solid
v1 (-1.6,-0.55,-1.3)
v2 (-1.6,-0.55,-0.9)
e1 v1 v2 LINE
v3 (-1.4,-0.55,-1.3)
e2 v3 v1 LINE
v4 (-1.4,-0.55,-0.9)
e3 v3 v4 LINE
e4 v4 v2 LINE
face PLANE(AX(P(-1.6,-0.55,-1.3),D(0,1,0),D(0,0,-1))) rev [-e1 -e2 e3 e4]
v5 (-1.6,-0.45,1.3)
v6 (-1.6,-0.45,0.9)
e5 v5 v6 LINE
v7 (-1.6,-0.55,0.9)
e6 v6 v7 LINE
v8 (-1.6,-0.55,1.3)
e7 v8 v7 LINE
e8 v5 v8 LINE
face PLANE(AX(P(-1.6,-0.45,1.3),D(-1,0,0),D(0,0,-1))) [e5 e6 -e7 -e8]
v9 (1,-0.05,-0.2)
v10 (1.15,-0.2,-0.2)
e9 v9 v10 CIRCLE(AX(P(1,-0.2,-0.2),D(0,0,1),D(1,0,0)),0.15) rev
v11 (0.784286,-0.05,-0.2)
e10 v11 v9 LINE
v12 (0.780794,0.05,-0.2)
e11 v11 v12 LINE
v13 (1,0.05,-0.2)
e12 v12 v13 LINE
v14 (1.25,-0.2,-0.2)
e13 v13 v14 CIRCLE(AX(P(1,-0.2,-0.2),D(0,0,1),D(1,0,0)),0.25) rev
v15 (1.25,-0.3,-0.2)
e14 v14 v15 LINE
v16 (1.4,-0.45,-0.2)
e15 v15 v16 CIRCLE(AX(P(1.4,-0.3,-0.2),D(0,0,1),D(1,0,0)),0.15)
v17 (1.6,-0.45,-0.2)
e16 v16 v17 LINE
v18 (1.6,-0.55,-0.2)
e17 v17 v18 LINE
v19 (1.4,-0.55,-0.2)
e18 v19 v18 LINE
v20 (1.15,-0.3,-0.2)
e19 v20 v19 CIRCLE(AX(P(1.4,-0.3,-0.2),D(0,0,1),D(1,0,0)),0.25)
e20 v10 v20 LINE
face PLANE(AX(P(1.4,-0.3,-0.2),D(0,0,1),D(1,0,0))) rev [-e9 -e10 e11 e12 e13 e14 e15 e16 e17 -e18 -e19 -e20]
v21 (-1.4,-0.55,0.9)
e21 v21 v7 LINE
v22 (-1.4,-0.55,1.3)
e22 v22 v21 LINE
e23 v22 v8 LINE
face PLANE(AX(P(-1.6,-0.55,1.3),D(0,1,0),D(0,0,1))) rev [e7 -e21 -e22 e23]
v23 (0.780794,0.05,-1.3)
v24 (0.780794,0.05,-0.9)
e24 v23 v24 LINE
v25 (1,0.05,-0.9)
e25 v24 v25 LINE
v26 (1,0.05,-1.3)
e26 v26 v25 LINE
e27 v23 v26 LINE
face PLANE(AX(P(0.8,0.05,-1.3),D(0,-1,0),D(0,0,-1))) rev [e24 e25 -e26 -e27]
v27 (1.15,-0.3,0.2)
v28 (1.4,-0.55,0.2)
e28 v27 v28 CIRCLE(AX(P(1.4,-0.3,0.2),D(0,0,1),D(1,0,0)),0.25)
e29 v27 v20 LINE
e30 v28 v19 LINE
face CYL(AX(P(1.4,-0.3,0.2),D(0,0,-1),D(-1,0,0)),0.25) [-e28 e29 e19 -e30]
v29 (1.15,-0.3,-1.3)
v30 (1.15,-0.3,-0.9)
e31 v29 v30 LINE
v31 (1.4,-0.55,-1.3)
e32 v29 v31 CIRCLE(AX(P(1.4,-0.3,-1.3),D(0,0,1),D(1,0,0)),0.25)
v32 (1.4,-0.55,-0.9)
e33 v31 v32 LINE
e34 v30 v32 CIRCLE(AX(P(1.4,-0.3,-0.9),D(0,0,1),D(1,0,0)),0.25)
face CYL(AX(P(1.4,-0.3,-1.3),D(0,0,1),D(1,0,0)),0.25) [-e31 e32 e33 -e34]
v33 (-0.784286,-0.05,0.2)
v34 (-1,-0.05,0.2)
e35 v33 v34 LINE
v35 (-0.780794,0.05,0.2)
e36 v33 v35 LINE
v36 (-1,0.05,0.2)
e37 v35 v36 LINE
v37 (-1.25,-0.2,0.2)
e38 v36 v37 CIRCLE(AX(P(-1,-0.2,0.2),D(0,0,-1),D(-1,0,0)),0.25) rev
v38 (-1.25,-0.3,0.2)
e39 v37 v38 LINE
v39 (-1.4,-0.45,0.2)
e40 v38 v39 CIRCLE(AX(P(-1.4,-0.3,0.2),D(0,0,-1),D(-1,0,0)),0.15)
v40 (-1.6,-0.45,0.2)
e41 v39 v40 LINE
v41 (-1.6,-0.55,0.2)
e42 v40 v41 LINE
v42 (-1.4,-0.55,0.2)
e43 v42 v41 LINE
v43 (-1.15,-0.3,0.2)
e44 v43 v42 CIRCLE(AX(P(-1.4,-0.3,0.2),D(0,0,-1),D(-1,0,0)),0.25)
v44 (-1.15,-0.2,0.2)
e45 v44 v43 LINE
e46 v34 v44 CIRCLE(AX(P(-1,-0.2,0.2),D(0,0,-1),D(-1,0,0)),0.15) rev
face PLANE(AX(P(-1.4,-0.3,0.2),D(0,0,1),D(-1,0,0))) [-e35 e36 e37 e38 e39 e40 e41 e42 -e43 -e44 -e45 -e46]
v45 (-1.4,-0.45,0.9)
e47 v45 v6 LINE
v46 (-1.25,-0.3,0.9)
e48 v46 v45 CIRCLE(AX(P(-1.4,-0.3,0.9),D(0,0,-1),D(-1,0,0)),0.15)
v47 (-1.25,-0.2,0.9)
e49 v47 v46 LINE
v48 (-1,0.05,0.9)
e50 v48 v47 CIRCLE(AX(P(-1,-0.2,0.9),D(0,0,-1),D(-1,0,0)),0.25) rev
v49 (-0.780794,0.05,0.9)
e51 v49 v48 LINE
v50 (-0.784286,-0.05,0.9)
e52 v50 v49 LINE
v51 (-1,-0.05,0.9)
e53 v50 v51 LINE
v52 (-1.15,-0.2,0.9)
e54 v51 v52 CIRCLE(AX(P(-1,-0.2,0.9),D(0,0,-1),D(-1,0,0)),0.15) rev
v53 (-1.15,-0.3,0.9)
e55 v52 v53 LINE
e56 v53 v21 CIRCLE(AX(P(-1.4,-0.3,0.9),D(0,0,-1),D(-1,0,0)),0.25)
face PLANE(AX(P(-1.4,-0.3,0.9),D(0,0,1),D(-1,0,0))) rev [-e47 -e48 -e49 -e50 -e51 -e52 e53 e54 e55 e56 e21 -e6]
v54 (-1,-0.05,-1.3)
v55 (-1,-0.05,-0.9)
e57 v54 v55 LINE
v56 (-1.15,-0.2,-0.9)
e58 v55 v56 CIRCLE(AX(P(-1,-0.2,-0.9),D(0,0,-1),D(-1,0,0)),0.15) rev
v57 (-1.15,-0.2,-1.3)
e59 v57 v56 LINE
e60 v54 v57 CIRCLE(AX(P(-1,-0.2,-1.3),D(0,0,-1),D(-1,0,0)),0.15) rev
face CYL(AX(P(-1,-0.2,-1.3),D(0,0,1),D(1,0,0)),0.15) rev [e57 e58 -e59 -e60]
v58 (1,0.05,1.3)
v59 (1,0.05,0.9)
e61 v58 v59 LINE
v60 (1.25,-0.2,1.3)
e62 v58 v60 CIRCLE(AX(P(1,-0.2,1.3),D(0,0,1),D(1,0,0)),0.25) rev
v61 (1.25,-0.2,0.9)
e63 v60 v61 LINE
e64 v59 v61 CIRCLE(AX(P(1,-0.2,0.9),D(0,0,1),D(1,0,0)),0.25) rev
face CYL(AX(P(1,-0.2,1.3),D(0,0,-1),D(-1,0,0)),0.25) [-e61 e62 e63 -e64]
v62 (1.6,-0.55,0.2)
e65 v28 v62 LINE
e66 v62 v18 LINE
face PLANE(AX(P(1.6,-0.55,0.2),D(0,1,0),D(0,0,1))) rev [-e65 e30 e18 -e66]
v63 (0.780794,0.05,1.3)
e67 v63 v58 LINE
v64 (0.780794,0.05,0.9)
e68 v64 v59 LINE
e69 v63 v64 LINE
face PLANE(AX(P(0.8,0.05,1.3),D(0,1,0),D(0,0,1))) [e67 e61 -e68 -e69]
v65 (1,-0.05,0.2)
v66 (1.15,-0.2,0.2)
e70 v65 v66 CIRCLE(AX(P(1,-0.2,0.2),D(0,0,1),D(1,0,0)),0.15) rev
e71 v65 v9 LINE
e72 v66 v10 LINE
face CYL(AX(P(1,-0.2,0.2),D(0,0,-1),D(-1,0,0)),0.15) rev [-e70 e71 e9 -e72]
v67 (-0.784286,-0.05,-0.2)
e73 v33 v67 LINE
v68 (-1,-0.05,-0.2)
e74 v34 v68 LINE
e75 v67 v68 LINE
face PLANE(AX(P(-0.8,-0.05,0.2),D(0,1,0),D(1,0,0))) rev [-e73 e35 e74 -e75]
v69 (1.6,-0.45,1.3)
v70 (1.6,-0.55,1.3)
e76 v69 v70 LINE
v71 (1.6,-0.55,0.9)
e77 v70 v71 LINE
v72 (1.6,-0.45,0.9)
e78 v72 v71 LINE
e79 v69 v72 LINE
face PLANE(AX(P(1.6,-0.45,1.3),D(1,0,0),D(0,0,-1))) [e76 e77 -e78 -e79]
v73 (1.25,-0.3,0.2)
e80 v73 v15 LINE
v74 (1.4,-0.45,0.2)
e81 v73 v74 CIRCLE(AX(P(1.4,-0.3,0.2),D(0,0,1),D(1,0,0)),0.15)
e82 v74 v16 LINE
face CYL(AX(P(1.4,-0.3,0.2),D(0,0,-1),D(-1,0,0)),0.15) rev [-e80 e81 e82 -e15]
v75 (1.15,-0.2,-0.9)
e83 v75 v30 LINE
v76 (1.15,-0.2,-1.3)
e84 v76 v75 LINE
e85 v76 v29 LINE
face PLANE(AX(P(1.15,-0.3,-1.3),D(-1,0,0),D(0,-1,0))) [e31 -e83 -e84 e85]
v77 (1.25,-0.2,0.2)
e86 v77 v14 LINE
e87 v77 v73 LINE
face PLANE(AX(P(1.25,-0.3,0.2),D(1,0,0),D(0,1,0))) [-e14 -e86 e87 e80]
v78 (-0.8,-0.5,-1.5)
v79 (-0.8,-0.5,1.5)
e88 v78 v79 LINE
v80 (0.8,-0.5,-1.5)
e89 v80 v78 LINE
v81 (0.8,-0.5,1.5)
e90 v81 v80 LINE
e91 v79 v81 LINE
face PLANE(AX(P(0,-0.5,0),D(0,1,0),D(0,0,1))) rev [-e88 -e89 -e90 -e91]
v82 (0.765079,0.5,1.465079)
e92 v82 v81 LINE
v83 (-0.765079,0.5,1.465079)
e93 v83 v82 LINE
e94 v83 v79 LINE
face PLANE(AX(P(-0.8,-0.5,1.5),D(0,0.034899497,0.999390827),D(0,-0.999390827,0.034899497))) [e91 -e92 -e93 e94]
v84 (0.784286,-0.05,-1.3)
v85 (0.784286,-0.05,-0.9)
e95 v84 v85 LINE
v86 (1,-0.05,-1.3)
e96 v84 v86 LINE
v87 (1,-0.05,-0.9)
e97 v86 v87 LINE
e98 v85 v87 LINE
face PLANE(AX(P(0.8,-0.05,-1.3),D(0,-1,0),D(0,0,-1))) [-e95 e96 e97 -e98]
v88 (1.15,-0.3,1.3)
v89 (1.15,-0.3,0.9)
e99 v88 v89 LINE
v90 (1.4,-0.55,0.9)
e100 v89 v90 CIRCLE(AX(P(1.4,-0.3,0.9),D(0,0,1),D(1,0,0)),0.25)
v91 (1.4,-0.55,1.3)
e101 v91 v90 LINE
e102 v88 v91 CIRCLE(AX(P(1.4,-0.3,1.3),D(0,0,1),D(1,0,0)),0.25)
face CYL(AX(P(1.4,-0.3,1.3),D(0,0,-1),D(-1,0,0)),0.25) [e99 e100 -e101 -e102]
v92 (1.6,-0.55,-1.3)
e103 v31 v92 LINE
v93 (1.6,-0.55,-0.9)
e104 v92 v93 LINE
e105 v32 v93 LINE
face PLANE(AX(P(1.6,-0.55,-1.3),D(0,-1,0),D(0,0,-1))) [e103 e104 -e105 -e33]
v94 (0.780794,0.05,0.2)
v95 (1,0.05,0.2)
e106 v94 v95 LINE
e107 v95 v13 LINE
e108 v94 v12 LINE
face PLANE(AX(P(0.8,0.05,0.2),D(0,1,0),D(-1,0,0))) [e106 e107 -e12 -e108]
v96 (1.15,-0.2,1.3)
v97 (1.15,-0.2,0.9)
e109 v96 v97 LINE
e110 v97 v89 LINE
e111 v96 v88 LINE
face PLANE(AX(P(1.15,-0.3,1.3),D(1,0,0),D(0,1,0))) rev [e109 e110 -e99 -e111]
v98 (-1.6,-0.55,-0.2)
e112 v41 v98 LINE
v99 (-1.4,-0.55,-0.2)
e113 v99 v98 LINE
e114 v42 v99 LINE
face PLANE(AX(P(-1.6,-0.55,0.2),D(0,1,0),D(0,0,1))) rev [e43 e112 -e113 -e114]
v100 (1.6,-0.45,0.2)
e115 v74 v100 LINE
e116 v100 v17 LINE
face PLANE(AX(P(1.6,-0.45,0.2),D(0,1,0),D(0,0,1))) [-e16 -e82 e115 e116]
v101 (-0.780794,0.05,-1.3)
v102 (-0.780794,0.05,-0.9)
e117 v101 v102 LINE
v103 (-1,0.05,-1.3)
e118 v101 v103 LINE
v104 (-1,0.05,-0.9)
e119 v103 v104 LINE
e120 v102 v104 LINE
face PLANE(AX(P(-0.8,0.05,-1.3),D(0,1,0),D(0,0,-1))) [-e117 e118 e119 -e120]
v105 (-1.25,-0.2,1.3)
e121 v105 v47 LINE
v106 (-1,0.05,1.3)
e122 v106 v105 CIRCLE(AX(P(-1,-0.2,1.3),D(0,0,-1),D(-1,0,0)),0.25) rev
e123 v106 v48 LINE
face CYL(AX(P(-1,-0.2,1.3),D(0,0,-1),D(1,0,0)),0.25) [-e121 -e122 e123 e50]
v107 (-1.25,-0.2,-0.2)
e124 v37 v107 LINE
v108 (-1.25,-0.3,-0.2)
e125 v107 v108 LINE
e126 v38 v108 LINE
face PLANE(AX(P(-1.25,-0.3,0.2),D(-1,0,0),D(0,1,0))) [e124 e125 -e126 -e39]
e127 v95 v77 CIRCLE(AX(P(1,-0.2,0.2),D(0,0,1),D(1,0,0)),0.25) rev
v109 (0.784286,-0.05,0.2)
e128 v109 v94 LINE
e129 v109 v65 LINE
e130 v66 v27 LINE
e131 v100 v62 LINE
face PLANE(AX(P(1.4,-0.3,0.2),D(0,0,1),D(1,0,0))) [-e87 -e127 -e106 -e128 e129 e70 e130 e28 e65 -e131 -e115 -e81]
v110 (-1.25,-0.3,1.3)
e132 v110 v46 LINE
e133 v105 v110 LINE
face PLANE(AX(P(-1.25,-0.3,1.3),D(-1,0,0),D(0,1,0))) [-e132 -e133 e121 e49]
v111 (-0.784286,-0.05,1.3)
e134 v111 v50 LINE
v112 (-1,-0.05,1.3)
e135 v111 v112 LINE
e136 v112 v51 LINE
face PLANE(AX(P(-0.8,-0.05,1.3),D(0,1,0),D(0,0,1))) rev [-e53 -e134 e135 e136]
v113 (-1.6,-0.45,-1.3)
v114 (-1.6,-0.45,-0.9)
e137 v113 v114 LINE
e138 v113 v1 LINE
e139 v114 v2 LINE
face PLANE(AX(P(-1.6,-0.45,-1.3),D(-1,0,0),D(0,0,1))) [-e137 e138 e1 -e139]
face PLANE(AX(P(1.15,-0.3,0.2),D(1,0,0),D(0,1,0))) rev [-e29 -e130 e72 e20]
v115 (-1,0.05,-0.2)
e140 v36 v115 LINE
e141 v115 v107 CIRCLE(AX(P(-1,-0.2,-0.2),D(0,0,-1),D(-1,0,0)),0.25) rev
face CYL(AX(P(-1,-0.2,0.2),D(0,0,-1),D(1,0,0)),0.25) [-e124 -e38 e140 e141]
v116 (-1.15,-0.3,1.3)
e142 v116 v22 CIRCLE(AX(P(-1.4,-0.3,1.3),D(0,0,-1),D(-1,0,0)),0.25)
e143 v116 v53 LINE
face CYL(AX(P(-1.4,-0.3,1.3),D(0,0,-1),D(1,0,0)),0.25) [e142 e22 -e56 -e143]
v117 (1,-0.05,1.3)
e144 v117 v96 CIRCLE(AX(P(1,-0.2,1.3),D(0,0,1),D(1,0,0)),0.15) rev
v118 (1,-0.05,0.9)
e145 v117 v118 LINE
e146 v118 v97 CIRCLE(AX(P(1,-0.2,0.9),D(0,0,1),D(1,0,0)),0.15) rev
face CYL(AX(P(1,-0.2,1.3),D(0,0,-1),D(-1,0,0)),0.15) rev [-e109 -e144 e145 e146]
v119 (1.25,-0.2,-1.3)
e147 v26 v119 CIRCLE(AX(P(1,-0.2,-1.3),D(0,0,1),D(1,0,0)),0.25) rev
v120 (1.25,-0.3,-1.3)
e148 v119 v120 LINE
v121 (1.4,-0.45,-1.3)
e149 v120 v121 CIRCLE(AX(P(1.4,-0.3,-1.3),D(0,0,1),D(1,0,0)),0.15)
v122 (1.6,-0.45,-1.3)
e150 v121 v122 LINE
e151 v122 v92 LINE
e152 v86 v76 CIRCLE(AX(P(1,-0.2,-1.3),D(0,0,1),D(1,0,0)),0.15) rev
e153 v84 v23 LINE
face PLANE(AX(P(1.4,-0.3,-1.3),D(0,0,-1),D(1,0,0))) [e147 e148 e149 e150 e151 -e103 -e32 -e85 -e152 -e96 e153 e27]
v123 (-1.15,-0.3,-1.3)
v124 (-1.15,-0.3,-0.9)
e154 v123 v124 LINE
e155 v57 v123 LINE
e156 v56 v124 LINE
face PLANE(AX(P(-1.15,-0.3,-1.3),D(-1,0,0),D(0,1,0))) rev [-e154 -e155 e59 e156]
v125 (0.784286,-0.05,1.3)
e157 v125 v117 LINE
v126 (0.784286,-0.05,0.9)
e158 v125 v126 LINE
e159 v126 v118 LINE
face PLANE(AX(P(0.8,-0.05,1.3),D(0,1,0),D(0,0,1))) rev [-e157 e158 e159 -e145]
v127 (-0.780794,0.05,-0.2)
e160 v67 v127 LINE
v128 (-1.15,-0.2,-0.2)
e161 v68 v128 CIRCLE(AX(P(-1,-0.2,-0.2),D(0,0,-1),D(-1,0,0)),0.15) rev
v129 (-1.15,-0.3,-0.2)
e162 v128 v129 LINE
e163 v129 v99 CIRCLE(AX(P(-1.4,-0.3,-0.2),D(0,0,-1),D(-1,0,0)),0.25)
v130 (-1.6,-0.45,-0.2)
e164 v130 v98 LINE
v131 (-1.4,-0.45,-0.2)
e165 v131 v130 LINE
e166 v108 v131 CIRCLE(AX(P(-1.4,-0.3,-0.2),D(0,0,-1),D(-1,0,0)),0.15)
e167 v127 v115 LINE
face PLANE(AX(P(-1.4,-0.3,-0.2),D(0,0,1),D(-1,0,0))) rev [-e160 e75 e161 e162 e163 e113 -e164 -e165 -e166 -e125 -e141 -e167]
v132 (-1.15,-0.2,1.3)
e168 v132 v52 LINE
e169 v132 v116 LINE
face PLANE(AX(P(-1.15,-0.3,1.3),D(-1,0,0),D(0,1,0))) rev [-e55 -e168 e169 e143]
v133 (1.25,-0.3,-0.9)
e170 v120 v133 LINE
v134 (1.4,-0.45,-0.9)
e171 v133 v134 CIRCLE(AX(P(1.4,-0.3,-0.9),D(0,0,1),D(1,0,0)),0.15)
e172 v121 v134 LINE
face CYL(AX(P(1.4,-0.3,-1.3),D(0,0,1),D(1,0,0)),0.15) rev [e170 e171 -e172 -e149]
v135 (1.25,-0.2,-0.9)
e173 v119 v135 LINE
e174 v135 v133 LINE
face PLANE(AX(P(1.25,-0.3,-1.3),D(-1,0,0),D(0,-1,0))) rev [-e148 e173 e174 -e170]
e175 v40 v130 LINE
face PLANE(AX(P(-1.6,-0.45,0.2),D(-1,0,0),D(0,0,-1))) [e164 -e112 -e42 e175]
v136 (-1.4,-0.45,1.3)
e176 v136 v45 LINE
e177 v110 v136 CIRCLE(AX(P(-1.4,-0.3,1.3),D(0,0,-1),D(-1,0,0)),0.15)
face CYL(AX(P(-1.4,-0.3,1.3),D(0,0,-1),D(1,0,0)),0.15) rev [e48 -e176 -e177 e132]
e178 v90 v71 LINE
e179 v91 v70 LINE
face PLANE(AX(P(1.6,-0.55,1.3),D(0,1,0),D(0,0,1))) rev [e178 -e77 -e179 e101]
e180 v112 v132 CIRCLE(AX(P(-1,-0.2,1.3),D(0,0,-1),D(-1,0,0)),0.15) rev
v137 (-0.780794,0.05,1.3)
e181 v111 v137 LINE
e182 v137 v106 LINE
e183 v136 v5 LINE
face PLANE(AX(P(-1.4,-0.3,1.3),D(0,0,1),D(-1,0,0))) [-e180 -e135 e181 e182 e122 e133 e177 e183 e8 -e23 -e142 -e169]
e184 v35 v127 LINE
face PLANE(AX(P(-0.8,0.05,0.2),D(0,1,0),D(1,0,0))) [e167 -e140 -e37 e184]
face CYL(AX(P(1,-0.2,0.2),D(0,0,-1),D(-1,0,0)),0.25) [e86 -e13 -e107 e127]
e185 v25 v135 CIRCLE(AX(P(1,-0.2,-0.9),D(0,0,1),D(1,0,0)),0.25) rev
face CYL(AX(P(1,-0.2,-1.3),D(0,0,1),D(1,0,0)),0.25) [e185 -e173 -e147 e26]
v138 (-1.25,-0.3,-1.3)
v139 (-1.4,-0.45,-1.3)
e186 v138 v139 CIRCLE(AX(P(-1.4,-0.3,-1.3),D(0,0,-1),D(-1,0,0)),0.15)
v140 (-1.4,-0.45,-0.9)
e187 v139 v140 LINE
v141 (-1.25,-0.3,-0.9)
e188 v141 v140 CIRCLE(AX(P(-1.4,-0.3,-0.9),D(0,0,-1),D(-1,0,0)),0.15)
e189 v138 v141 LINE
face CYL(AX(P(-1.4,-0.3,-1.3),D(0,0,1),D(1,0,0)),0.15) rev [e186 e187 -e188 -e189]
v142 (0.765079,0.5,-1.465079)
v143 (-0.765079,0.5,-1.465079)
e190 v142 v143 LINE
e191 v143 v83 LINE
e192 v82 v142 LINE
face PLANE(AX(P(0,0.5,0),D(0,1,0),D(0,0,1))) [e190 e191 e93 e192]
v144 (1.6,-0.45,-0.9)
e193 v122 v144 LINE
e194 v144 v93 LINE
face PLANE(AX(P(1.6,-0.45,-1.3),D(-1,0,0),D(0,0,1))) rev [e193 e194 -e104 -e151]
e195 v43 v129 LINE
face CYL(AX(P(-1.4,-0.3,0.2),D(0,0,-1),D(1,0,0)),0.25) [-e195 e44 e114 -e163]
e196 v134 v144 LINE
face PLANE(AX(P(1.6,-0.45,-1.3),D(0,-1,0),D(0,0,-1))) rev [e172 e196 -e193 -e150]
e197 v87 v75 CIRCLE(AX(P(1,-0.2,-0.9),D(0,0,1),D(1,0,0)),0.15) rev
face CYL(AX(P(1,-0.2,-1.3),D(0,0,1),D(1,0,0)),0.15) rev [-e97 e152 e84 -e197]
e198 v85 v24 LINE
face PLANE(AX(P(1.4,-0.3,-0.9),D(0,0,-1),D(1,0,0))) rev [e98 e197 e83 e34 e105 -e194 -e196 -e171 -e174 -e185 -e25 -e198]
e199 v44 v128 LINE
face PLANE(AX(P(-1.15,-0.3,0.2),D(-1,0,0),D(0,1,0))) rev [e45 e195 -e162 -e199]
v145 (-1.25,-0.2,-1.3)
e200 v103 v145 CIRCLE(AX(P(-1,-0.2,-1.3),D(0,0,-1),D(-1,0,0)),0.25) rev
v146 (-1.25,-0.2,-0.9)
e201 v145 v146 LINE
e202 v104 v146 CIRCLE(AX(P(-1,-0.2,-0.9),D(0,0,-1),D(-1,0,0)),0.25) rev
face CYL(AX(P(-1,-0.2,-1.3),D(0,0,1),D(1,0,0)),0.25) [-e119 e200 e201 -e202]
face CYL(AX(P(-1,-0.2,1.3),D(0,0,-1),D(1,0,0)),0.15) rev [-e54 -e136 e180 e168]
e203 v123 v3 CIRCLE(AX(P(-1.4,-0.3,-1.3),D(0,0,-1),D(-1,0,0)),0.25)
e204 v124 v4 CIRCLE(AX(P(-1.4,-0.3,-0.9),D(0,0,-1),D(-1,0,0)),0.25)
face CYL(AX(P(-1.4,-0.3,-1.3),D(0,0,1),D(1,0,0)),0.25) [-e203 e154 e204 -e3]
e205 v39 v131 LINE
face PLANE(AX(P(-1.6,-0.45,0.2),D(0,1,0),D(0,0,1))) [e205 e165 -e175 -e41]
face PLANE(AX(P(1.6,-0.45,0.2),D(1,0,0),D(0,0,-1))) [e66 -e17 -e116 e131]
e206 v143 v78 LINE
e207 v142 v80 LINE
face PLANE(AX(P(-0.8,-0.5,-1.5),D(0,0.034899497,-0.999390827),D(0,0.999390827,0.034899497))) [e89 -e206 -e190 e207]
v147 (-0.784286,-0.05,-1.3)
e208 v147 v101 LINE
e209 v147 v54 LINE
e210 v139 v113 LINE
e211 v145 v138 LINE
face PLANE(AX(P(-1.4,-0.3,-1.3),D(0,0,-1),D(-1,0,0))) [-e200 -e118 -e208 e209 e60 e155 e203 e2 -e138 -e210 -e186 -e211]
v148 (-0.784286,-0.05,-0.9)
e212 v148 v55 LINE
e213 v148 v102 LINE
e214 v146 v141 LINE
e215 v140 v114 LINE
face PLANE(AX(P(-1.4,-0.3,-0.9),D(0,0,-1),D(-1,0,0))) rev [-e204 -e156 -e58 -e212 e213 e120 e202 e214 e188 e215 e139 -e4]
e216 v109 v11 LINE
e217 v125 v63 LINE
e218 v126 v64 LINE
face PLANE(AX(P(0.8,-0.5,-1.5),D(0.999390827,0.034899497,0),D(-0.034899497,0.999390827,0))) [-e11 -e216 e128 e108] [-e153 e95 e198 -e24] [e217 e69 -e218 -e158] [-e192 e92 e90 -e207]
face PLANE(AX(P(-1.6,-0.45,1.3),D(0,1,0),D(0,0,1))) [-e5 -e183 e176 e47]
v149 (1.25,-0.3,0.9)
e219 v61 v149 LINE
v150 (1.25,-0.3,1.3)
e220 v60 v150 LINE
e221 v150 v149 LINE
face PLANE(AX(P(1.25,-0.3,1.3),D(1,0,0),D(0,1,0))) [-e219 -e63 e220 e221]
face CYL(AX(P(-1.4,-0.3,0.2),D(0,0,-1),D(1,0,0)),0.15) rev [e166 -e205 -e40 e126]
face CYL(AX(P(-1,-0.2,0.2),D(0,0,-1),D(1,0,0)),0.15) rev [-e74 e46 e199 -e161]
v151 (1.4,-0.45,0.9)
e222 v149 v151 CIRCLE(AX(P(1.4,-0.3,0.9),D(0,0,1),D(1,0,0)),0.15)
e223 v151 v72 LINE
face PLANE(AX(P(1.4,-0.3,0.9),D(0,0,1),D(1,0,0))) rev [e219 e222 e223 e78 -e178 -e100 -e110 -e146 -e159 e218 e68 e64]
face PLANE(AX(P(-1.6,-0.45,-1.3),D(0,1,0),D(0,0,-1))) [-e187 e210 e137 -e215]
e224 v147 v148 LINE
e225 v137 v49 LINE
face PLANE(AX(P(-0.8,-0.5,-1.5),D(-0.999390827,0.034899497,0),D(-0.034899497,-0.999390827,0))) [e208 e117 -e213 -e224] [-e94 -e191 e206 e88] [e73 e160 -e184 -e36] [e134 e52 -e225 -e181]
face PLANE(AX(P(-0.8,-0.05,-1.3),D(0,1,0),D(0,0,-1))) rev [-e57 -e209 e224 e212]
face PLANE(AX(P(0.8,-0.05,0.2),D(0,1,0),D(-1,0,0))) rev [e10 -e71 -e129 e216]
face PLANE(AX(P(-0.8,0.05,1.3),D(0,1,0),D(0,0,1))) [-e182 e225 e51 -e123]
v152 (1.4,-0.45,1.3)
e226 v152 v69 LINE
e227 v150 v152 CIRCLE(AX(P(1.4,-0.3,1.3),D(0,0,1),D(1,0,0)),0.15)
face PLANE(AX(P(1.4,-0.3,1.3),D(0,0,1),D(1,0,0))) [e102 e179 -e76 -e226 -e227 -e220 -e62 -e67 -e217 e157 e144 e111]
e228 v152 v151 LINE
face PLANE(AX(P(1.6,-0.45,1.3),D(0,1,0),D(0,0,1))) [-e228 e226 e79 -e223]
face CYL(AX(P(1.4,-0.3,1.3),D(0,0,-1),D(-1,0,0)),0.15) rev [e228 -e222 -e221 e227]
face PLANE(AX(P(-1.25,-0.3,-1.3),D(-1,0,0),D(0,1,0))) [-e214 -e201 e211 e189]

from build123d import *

# Parameters (mm, degrees)
BASES_W         = 1.6
BASES_H         = 3
BASE_DEPTH      = 0.5
LEG2_DEPTH      = 0.2
MIDDLELEG_DEPTH = 0.2
BODYDRAFT_ANGLE = -2
MIRROR1_START   = -1.3
MIRROR1_DEPTH   = 0.4
MIRROR1_START_2 = -0.2
MIRROR1_2_DEPTH = 0.4
MIRROR1_START_3 = 0.9
MIRROR1_3_DEPTH = 0.4


# Read off the part's stored shape, not the designer's step: Mirror1
with BuildPart() as part:
    # BaseS → Base (new, symmetric)
    with BuildSketch(Plane(origin=(0, 0, 0), x_dir=(1, 0, 0), z_dir=(0, 1, 0))):
        Rectangle(BASES_W, BASES_H)
    extrude(amount=BASE_DEPTH, both=True)

    # Leg2S → Leg2 (add, symmetric)
    with BuildSketch(Plane.XY.offset(1.1)):
        with BuildLine():
            Line((1.6, -0.45), (1.4, -0.45))
            ThreePointArc((1.4, -0.45), (1.293933983, -0.406066017), (1.25, -0.3))
            Line((1.25, -0.3), (1.25, -0.2))
            ThreePointArc((1.25, -0.2), (1.176776695, -0.023223305), (1, 0.05))
            Line((1, 0.05), (0.8, 0.05))
            Line((0.8, 0.05), (0.8, -0.05))
            Line((0.8, -0.05), (1, -0.05))
            ThreePointArc((1, -0.05), (1.106066017, -0.093933983), (1.15, -0.2))
            Line((1.15, -0.2), (1.15, -0.3))
            ThreePointArc((1.15, -0.3), (1.223223305, -0.476776695), (1.4, -0.55))
            Line((1.4, -0.55), (1.6, -0.55))
            Line((1.6, -0.55), (1.6, -0.45))
        make_face()
    leg2 = extrude(amount=LEG2_DEPTH, both=True)

    # Leg2M: Leg2 across plane
    add(leg2.mirror(Plane.XY))

    # MiddleLegS → MiddleLeg (add, symmetric)
    with BuildSketch(Plane.XY):
        with BuildLine():
            Line((1.6, -0.45), (1.4, -0.45))
            ThreePointArc((1.4, -0.45), (1.293933983, -0.406066017), (1.25, -0.3))
            Line((1.25, -0.3), (1.25, -0.2))
            ThreePointArc((1.25, -0.2), (1.176776695, -0.023223305), (1, 0.05))
            Line((1, 0.05), (0.8, 0.05))
            Line((0.8, 0.05), (0.8, -0.05))
            Line((0.8, -0.05), (1, -0.05))
            ThreePointArc((1, -0.05), (1.106066017, -0.093933983), (1.15, -0.2))
            Line((1.15, -0.2), (1.15, -0.3))
            ThreePointArc((1.15, -0.3), (1.223223305, -0.476776695), (1.4, -0.55))
            Line((1.4, -0.55), (1.6, -0.55))
            Line((1.6, -0.55), (1.6, -0.45))
        make_face()
    extrude(amount=MIDDLELEG_DEPTH, both=True)

    # BodyDraft
    bodydraft_faces = [part.faces().sort_by_distance(p)[0] for p in [
        (0.8, -0.468377223, 0),
        (0, 0, -1.5),
        (-0.8, 0, 0),
        (0, 0, 1.5),
    ]]
    draft(bodydraft_faces, Plane(origin=(0, -0.5, 0), x_dir=(0, 0, -1), z_dir=(0, -1, 0)), BODYDRAFT_ANGLE)

    # Mirror1 outline → Mirror1 (add)
    with BuildSketch(Plane.XY.offset(MIRROR1_START)):
        with BuildLine():
            Line((-1.6, -0.55), (-1.4, -0.55))
            ThreePointArc((-1.4, -0.55), (-1.223223305, -0.476776695), (-1.15, -0.3))
            Line((-1.15, -0.3), (-1.15, -0.2))
            ThreePointArc((-1.15, -0.2), (-1.106066017, -0.093933983), (-1, -0.05))
            Line((-1, -0.05), (-0.784285654, -0.05))
            Line((-0.784285654, -0.05), (-0.780793577, 0.05))
            Line((-0.780793577, 0.05), (-1, 0.05))
            ThreePointArc((-1, 0.05), (-1.176776695, -0.023223305), (-1.25, -0.2))
            Line((-1.25, -0.2), (-1.25, -0.3))
            ThreePointArc((-1.25, -0.3), (-1.293933983, -0.406066017), (-1.4, -0.45))
            Line((-1.4, -0.45), (-1.6, -0.45))
            Line((-1.6, -0.45), (-1.6, -0.55))
        make_face()
    extrude(amount=MIRROR1_DEPTH)

    # Mirror1 2 outline → Mirror1 2 (add)
    with BuildSketch(Plane.XY.offset(MIRROR1_START_2)):
        with BuildLine():
            Line((-1.6, -0.55), (-1.4, -0.55))
            ThreePointArc((-1.4, -0.55), (-1.223223305, -0.476776695), (-1.15, -0.3))
            Line((-1.15, -0.3), (-1.15, -0.2))
            ThreePointArc((-1.15, -0.2), (-1.106066017, -0.093933983), (-1, -0.05))
            Line((-1, -0.05), (-0.784285654, -0.05))
            Line((-0.784285654, -0.05), (-0.780793577, 0.05))
            Line((-0.780793577, 0.05), (-1, 0.05))
            ThreePointArc((-1, 0.05), (-1.176776695, -0.023223305), (-1.25, -0.2))
            Line((-1.25, -0.2), (-1.25, -0.3))
            ThreePointArc((-1.25, -0.3), (-1.293933983, -0.406066017), (-1.4, -0.45))
            Line((-1.4, -0.45), (-1.6, -0.45))
            Line((-1.6, -0.45), (-1.6, -0.55))
        make_face()
    extrude(amount=MIRROR1_2_DEPTH)

    # Mirror1 3 outline → Mirror1 3 (add)
    with BuildSketch(Plane.XY.offset(MIRROR1_START_3)):
        with BuildLine():
            Line((-1.6, -0.55), (-1.4, -0.55))
            ThreePointArc((-1.4, -0.55), (-1.223223305, -0.476776695), (-1.15, -0.3))
            Line((-1.15, -0.3), (-1.15, -0.2))
            ThreePointArc((-1.15, -0.2), (-1.106066017, -0.093933983), (-1, -0.05))
            Line((-1, -0.05), (-0.784285654, -0.05))
            Line((-0.784285654, -0.05), (-0.780793577, 0.05))
            Line((-0.780793577, 0.05), (-1, 0.05))
            ThreePointArc((-1, 0.05), (-1.176776695, -0.023223305), (-1.25, -0.2))
            Line((-1.25, -0.2), (-1.25, -0.3))
            ThreePointArc((-1.25, -0.3), (-1.293933983, -0.406066017), (-1.4, -0.45))
            Line((-1.4, -0.45), (-1.6, -0.45))
            Line((-1.6, -0.45), (-1.6, -0.55))
        make_face()
    extrude(amount=MIRROR1_3_DEPTH)


solid = part.part
